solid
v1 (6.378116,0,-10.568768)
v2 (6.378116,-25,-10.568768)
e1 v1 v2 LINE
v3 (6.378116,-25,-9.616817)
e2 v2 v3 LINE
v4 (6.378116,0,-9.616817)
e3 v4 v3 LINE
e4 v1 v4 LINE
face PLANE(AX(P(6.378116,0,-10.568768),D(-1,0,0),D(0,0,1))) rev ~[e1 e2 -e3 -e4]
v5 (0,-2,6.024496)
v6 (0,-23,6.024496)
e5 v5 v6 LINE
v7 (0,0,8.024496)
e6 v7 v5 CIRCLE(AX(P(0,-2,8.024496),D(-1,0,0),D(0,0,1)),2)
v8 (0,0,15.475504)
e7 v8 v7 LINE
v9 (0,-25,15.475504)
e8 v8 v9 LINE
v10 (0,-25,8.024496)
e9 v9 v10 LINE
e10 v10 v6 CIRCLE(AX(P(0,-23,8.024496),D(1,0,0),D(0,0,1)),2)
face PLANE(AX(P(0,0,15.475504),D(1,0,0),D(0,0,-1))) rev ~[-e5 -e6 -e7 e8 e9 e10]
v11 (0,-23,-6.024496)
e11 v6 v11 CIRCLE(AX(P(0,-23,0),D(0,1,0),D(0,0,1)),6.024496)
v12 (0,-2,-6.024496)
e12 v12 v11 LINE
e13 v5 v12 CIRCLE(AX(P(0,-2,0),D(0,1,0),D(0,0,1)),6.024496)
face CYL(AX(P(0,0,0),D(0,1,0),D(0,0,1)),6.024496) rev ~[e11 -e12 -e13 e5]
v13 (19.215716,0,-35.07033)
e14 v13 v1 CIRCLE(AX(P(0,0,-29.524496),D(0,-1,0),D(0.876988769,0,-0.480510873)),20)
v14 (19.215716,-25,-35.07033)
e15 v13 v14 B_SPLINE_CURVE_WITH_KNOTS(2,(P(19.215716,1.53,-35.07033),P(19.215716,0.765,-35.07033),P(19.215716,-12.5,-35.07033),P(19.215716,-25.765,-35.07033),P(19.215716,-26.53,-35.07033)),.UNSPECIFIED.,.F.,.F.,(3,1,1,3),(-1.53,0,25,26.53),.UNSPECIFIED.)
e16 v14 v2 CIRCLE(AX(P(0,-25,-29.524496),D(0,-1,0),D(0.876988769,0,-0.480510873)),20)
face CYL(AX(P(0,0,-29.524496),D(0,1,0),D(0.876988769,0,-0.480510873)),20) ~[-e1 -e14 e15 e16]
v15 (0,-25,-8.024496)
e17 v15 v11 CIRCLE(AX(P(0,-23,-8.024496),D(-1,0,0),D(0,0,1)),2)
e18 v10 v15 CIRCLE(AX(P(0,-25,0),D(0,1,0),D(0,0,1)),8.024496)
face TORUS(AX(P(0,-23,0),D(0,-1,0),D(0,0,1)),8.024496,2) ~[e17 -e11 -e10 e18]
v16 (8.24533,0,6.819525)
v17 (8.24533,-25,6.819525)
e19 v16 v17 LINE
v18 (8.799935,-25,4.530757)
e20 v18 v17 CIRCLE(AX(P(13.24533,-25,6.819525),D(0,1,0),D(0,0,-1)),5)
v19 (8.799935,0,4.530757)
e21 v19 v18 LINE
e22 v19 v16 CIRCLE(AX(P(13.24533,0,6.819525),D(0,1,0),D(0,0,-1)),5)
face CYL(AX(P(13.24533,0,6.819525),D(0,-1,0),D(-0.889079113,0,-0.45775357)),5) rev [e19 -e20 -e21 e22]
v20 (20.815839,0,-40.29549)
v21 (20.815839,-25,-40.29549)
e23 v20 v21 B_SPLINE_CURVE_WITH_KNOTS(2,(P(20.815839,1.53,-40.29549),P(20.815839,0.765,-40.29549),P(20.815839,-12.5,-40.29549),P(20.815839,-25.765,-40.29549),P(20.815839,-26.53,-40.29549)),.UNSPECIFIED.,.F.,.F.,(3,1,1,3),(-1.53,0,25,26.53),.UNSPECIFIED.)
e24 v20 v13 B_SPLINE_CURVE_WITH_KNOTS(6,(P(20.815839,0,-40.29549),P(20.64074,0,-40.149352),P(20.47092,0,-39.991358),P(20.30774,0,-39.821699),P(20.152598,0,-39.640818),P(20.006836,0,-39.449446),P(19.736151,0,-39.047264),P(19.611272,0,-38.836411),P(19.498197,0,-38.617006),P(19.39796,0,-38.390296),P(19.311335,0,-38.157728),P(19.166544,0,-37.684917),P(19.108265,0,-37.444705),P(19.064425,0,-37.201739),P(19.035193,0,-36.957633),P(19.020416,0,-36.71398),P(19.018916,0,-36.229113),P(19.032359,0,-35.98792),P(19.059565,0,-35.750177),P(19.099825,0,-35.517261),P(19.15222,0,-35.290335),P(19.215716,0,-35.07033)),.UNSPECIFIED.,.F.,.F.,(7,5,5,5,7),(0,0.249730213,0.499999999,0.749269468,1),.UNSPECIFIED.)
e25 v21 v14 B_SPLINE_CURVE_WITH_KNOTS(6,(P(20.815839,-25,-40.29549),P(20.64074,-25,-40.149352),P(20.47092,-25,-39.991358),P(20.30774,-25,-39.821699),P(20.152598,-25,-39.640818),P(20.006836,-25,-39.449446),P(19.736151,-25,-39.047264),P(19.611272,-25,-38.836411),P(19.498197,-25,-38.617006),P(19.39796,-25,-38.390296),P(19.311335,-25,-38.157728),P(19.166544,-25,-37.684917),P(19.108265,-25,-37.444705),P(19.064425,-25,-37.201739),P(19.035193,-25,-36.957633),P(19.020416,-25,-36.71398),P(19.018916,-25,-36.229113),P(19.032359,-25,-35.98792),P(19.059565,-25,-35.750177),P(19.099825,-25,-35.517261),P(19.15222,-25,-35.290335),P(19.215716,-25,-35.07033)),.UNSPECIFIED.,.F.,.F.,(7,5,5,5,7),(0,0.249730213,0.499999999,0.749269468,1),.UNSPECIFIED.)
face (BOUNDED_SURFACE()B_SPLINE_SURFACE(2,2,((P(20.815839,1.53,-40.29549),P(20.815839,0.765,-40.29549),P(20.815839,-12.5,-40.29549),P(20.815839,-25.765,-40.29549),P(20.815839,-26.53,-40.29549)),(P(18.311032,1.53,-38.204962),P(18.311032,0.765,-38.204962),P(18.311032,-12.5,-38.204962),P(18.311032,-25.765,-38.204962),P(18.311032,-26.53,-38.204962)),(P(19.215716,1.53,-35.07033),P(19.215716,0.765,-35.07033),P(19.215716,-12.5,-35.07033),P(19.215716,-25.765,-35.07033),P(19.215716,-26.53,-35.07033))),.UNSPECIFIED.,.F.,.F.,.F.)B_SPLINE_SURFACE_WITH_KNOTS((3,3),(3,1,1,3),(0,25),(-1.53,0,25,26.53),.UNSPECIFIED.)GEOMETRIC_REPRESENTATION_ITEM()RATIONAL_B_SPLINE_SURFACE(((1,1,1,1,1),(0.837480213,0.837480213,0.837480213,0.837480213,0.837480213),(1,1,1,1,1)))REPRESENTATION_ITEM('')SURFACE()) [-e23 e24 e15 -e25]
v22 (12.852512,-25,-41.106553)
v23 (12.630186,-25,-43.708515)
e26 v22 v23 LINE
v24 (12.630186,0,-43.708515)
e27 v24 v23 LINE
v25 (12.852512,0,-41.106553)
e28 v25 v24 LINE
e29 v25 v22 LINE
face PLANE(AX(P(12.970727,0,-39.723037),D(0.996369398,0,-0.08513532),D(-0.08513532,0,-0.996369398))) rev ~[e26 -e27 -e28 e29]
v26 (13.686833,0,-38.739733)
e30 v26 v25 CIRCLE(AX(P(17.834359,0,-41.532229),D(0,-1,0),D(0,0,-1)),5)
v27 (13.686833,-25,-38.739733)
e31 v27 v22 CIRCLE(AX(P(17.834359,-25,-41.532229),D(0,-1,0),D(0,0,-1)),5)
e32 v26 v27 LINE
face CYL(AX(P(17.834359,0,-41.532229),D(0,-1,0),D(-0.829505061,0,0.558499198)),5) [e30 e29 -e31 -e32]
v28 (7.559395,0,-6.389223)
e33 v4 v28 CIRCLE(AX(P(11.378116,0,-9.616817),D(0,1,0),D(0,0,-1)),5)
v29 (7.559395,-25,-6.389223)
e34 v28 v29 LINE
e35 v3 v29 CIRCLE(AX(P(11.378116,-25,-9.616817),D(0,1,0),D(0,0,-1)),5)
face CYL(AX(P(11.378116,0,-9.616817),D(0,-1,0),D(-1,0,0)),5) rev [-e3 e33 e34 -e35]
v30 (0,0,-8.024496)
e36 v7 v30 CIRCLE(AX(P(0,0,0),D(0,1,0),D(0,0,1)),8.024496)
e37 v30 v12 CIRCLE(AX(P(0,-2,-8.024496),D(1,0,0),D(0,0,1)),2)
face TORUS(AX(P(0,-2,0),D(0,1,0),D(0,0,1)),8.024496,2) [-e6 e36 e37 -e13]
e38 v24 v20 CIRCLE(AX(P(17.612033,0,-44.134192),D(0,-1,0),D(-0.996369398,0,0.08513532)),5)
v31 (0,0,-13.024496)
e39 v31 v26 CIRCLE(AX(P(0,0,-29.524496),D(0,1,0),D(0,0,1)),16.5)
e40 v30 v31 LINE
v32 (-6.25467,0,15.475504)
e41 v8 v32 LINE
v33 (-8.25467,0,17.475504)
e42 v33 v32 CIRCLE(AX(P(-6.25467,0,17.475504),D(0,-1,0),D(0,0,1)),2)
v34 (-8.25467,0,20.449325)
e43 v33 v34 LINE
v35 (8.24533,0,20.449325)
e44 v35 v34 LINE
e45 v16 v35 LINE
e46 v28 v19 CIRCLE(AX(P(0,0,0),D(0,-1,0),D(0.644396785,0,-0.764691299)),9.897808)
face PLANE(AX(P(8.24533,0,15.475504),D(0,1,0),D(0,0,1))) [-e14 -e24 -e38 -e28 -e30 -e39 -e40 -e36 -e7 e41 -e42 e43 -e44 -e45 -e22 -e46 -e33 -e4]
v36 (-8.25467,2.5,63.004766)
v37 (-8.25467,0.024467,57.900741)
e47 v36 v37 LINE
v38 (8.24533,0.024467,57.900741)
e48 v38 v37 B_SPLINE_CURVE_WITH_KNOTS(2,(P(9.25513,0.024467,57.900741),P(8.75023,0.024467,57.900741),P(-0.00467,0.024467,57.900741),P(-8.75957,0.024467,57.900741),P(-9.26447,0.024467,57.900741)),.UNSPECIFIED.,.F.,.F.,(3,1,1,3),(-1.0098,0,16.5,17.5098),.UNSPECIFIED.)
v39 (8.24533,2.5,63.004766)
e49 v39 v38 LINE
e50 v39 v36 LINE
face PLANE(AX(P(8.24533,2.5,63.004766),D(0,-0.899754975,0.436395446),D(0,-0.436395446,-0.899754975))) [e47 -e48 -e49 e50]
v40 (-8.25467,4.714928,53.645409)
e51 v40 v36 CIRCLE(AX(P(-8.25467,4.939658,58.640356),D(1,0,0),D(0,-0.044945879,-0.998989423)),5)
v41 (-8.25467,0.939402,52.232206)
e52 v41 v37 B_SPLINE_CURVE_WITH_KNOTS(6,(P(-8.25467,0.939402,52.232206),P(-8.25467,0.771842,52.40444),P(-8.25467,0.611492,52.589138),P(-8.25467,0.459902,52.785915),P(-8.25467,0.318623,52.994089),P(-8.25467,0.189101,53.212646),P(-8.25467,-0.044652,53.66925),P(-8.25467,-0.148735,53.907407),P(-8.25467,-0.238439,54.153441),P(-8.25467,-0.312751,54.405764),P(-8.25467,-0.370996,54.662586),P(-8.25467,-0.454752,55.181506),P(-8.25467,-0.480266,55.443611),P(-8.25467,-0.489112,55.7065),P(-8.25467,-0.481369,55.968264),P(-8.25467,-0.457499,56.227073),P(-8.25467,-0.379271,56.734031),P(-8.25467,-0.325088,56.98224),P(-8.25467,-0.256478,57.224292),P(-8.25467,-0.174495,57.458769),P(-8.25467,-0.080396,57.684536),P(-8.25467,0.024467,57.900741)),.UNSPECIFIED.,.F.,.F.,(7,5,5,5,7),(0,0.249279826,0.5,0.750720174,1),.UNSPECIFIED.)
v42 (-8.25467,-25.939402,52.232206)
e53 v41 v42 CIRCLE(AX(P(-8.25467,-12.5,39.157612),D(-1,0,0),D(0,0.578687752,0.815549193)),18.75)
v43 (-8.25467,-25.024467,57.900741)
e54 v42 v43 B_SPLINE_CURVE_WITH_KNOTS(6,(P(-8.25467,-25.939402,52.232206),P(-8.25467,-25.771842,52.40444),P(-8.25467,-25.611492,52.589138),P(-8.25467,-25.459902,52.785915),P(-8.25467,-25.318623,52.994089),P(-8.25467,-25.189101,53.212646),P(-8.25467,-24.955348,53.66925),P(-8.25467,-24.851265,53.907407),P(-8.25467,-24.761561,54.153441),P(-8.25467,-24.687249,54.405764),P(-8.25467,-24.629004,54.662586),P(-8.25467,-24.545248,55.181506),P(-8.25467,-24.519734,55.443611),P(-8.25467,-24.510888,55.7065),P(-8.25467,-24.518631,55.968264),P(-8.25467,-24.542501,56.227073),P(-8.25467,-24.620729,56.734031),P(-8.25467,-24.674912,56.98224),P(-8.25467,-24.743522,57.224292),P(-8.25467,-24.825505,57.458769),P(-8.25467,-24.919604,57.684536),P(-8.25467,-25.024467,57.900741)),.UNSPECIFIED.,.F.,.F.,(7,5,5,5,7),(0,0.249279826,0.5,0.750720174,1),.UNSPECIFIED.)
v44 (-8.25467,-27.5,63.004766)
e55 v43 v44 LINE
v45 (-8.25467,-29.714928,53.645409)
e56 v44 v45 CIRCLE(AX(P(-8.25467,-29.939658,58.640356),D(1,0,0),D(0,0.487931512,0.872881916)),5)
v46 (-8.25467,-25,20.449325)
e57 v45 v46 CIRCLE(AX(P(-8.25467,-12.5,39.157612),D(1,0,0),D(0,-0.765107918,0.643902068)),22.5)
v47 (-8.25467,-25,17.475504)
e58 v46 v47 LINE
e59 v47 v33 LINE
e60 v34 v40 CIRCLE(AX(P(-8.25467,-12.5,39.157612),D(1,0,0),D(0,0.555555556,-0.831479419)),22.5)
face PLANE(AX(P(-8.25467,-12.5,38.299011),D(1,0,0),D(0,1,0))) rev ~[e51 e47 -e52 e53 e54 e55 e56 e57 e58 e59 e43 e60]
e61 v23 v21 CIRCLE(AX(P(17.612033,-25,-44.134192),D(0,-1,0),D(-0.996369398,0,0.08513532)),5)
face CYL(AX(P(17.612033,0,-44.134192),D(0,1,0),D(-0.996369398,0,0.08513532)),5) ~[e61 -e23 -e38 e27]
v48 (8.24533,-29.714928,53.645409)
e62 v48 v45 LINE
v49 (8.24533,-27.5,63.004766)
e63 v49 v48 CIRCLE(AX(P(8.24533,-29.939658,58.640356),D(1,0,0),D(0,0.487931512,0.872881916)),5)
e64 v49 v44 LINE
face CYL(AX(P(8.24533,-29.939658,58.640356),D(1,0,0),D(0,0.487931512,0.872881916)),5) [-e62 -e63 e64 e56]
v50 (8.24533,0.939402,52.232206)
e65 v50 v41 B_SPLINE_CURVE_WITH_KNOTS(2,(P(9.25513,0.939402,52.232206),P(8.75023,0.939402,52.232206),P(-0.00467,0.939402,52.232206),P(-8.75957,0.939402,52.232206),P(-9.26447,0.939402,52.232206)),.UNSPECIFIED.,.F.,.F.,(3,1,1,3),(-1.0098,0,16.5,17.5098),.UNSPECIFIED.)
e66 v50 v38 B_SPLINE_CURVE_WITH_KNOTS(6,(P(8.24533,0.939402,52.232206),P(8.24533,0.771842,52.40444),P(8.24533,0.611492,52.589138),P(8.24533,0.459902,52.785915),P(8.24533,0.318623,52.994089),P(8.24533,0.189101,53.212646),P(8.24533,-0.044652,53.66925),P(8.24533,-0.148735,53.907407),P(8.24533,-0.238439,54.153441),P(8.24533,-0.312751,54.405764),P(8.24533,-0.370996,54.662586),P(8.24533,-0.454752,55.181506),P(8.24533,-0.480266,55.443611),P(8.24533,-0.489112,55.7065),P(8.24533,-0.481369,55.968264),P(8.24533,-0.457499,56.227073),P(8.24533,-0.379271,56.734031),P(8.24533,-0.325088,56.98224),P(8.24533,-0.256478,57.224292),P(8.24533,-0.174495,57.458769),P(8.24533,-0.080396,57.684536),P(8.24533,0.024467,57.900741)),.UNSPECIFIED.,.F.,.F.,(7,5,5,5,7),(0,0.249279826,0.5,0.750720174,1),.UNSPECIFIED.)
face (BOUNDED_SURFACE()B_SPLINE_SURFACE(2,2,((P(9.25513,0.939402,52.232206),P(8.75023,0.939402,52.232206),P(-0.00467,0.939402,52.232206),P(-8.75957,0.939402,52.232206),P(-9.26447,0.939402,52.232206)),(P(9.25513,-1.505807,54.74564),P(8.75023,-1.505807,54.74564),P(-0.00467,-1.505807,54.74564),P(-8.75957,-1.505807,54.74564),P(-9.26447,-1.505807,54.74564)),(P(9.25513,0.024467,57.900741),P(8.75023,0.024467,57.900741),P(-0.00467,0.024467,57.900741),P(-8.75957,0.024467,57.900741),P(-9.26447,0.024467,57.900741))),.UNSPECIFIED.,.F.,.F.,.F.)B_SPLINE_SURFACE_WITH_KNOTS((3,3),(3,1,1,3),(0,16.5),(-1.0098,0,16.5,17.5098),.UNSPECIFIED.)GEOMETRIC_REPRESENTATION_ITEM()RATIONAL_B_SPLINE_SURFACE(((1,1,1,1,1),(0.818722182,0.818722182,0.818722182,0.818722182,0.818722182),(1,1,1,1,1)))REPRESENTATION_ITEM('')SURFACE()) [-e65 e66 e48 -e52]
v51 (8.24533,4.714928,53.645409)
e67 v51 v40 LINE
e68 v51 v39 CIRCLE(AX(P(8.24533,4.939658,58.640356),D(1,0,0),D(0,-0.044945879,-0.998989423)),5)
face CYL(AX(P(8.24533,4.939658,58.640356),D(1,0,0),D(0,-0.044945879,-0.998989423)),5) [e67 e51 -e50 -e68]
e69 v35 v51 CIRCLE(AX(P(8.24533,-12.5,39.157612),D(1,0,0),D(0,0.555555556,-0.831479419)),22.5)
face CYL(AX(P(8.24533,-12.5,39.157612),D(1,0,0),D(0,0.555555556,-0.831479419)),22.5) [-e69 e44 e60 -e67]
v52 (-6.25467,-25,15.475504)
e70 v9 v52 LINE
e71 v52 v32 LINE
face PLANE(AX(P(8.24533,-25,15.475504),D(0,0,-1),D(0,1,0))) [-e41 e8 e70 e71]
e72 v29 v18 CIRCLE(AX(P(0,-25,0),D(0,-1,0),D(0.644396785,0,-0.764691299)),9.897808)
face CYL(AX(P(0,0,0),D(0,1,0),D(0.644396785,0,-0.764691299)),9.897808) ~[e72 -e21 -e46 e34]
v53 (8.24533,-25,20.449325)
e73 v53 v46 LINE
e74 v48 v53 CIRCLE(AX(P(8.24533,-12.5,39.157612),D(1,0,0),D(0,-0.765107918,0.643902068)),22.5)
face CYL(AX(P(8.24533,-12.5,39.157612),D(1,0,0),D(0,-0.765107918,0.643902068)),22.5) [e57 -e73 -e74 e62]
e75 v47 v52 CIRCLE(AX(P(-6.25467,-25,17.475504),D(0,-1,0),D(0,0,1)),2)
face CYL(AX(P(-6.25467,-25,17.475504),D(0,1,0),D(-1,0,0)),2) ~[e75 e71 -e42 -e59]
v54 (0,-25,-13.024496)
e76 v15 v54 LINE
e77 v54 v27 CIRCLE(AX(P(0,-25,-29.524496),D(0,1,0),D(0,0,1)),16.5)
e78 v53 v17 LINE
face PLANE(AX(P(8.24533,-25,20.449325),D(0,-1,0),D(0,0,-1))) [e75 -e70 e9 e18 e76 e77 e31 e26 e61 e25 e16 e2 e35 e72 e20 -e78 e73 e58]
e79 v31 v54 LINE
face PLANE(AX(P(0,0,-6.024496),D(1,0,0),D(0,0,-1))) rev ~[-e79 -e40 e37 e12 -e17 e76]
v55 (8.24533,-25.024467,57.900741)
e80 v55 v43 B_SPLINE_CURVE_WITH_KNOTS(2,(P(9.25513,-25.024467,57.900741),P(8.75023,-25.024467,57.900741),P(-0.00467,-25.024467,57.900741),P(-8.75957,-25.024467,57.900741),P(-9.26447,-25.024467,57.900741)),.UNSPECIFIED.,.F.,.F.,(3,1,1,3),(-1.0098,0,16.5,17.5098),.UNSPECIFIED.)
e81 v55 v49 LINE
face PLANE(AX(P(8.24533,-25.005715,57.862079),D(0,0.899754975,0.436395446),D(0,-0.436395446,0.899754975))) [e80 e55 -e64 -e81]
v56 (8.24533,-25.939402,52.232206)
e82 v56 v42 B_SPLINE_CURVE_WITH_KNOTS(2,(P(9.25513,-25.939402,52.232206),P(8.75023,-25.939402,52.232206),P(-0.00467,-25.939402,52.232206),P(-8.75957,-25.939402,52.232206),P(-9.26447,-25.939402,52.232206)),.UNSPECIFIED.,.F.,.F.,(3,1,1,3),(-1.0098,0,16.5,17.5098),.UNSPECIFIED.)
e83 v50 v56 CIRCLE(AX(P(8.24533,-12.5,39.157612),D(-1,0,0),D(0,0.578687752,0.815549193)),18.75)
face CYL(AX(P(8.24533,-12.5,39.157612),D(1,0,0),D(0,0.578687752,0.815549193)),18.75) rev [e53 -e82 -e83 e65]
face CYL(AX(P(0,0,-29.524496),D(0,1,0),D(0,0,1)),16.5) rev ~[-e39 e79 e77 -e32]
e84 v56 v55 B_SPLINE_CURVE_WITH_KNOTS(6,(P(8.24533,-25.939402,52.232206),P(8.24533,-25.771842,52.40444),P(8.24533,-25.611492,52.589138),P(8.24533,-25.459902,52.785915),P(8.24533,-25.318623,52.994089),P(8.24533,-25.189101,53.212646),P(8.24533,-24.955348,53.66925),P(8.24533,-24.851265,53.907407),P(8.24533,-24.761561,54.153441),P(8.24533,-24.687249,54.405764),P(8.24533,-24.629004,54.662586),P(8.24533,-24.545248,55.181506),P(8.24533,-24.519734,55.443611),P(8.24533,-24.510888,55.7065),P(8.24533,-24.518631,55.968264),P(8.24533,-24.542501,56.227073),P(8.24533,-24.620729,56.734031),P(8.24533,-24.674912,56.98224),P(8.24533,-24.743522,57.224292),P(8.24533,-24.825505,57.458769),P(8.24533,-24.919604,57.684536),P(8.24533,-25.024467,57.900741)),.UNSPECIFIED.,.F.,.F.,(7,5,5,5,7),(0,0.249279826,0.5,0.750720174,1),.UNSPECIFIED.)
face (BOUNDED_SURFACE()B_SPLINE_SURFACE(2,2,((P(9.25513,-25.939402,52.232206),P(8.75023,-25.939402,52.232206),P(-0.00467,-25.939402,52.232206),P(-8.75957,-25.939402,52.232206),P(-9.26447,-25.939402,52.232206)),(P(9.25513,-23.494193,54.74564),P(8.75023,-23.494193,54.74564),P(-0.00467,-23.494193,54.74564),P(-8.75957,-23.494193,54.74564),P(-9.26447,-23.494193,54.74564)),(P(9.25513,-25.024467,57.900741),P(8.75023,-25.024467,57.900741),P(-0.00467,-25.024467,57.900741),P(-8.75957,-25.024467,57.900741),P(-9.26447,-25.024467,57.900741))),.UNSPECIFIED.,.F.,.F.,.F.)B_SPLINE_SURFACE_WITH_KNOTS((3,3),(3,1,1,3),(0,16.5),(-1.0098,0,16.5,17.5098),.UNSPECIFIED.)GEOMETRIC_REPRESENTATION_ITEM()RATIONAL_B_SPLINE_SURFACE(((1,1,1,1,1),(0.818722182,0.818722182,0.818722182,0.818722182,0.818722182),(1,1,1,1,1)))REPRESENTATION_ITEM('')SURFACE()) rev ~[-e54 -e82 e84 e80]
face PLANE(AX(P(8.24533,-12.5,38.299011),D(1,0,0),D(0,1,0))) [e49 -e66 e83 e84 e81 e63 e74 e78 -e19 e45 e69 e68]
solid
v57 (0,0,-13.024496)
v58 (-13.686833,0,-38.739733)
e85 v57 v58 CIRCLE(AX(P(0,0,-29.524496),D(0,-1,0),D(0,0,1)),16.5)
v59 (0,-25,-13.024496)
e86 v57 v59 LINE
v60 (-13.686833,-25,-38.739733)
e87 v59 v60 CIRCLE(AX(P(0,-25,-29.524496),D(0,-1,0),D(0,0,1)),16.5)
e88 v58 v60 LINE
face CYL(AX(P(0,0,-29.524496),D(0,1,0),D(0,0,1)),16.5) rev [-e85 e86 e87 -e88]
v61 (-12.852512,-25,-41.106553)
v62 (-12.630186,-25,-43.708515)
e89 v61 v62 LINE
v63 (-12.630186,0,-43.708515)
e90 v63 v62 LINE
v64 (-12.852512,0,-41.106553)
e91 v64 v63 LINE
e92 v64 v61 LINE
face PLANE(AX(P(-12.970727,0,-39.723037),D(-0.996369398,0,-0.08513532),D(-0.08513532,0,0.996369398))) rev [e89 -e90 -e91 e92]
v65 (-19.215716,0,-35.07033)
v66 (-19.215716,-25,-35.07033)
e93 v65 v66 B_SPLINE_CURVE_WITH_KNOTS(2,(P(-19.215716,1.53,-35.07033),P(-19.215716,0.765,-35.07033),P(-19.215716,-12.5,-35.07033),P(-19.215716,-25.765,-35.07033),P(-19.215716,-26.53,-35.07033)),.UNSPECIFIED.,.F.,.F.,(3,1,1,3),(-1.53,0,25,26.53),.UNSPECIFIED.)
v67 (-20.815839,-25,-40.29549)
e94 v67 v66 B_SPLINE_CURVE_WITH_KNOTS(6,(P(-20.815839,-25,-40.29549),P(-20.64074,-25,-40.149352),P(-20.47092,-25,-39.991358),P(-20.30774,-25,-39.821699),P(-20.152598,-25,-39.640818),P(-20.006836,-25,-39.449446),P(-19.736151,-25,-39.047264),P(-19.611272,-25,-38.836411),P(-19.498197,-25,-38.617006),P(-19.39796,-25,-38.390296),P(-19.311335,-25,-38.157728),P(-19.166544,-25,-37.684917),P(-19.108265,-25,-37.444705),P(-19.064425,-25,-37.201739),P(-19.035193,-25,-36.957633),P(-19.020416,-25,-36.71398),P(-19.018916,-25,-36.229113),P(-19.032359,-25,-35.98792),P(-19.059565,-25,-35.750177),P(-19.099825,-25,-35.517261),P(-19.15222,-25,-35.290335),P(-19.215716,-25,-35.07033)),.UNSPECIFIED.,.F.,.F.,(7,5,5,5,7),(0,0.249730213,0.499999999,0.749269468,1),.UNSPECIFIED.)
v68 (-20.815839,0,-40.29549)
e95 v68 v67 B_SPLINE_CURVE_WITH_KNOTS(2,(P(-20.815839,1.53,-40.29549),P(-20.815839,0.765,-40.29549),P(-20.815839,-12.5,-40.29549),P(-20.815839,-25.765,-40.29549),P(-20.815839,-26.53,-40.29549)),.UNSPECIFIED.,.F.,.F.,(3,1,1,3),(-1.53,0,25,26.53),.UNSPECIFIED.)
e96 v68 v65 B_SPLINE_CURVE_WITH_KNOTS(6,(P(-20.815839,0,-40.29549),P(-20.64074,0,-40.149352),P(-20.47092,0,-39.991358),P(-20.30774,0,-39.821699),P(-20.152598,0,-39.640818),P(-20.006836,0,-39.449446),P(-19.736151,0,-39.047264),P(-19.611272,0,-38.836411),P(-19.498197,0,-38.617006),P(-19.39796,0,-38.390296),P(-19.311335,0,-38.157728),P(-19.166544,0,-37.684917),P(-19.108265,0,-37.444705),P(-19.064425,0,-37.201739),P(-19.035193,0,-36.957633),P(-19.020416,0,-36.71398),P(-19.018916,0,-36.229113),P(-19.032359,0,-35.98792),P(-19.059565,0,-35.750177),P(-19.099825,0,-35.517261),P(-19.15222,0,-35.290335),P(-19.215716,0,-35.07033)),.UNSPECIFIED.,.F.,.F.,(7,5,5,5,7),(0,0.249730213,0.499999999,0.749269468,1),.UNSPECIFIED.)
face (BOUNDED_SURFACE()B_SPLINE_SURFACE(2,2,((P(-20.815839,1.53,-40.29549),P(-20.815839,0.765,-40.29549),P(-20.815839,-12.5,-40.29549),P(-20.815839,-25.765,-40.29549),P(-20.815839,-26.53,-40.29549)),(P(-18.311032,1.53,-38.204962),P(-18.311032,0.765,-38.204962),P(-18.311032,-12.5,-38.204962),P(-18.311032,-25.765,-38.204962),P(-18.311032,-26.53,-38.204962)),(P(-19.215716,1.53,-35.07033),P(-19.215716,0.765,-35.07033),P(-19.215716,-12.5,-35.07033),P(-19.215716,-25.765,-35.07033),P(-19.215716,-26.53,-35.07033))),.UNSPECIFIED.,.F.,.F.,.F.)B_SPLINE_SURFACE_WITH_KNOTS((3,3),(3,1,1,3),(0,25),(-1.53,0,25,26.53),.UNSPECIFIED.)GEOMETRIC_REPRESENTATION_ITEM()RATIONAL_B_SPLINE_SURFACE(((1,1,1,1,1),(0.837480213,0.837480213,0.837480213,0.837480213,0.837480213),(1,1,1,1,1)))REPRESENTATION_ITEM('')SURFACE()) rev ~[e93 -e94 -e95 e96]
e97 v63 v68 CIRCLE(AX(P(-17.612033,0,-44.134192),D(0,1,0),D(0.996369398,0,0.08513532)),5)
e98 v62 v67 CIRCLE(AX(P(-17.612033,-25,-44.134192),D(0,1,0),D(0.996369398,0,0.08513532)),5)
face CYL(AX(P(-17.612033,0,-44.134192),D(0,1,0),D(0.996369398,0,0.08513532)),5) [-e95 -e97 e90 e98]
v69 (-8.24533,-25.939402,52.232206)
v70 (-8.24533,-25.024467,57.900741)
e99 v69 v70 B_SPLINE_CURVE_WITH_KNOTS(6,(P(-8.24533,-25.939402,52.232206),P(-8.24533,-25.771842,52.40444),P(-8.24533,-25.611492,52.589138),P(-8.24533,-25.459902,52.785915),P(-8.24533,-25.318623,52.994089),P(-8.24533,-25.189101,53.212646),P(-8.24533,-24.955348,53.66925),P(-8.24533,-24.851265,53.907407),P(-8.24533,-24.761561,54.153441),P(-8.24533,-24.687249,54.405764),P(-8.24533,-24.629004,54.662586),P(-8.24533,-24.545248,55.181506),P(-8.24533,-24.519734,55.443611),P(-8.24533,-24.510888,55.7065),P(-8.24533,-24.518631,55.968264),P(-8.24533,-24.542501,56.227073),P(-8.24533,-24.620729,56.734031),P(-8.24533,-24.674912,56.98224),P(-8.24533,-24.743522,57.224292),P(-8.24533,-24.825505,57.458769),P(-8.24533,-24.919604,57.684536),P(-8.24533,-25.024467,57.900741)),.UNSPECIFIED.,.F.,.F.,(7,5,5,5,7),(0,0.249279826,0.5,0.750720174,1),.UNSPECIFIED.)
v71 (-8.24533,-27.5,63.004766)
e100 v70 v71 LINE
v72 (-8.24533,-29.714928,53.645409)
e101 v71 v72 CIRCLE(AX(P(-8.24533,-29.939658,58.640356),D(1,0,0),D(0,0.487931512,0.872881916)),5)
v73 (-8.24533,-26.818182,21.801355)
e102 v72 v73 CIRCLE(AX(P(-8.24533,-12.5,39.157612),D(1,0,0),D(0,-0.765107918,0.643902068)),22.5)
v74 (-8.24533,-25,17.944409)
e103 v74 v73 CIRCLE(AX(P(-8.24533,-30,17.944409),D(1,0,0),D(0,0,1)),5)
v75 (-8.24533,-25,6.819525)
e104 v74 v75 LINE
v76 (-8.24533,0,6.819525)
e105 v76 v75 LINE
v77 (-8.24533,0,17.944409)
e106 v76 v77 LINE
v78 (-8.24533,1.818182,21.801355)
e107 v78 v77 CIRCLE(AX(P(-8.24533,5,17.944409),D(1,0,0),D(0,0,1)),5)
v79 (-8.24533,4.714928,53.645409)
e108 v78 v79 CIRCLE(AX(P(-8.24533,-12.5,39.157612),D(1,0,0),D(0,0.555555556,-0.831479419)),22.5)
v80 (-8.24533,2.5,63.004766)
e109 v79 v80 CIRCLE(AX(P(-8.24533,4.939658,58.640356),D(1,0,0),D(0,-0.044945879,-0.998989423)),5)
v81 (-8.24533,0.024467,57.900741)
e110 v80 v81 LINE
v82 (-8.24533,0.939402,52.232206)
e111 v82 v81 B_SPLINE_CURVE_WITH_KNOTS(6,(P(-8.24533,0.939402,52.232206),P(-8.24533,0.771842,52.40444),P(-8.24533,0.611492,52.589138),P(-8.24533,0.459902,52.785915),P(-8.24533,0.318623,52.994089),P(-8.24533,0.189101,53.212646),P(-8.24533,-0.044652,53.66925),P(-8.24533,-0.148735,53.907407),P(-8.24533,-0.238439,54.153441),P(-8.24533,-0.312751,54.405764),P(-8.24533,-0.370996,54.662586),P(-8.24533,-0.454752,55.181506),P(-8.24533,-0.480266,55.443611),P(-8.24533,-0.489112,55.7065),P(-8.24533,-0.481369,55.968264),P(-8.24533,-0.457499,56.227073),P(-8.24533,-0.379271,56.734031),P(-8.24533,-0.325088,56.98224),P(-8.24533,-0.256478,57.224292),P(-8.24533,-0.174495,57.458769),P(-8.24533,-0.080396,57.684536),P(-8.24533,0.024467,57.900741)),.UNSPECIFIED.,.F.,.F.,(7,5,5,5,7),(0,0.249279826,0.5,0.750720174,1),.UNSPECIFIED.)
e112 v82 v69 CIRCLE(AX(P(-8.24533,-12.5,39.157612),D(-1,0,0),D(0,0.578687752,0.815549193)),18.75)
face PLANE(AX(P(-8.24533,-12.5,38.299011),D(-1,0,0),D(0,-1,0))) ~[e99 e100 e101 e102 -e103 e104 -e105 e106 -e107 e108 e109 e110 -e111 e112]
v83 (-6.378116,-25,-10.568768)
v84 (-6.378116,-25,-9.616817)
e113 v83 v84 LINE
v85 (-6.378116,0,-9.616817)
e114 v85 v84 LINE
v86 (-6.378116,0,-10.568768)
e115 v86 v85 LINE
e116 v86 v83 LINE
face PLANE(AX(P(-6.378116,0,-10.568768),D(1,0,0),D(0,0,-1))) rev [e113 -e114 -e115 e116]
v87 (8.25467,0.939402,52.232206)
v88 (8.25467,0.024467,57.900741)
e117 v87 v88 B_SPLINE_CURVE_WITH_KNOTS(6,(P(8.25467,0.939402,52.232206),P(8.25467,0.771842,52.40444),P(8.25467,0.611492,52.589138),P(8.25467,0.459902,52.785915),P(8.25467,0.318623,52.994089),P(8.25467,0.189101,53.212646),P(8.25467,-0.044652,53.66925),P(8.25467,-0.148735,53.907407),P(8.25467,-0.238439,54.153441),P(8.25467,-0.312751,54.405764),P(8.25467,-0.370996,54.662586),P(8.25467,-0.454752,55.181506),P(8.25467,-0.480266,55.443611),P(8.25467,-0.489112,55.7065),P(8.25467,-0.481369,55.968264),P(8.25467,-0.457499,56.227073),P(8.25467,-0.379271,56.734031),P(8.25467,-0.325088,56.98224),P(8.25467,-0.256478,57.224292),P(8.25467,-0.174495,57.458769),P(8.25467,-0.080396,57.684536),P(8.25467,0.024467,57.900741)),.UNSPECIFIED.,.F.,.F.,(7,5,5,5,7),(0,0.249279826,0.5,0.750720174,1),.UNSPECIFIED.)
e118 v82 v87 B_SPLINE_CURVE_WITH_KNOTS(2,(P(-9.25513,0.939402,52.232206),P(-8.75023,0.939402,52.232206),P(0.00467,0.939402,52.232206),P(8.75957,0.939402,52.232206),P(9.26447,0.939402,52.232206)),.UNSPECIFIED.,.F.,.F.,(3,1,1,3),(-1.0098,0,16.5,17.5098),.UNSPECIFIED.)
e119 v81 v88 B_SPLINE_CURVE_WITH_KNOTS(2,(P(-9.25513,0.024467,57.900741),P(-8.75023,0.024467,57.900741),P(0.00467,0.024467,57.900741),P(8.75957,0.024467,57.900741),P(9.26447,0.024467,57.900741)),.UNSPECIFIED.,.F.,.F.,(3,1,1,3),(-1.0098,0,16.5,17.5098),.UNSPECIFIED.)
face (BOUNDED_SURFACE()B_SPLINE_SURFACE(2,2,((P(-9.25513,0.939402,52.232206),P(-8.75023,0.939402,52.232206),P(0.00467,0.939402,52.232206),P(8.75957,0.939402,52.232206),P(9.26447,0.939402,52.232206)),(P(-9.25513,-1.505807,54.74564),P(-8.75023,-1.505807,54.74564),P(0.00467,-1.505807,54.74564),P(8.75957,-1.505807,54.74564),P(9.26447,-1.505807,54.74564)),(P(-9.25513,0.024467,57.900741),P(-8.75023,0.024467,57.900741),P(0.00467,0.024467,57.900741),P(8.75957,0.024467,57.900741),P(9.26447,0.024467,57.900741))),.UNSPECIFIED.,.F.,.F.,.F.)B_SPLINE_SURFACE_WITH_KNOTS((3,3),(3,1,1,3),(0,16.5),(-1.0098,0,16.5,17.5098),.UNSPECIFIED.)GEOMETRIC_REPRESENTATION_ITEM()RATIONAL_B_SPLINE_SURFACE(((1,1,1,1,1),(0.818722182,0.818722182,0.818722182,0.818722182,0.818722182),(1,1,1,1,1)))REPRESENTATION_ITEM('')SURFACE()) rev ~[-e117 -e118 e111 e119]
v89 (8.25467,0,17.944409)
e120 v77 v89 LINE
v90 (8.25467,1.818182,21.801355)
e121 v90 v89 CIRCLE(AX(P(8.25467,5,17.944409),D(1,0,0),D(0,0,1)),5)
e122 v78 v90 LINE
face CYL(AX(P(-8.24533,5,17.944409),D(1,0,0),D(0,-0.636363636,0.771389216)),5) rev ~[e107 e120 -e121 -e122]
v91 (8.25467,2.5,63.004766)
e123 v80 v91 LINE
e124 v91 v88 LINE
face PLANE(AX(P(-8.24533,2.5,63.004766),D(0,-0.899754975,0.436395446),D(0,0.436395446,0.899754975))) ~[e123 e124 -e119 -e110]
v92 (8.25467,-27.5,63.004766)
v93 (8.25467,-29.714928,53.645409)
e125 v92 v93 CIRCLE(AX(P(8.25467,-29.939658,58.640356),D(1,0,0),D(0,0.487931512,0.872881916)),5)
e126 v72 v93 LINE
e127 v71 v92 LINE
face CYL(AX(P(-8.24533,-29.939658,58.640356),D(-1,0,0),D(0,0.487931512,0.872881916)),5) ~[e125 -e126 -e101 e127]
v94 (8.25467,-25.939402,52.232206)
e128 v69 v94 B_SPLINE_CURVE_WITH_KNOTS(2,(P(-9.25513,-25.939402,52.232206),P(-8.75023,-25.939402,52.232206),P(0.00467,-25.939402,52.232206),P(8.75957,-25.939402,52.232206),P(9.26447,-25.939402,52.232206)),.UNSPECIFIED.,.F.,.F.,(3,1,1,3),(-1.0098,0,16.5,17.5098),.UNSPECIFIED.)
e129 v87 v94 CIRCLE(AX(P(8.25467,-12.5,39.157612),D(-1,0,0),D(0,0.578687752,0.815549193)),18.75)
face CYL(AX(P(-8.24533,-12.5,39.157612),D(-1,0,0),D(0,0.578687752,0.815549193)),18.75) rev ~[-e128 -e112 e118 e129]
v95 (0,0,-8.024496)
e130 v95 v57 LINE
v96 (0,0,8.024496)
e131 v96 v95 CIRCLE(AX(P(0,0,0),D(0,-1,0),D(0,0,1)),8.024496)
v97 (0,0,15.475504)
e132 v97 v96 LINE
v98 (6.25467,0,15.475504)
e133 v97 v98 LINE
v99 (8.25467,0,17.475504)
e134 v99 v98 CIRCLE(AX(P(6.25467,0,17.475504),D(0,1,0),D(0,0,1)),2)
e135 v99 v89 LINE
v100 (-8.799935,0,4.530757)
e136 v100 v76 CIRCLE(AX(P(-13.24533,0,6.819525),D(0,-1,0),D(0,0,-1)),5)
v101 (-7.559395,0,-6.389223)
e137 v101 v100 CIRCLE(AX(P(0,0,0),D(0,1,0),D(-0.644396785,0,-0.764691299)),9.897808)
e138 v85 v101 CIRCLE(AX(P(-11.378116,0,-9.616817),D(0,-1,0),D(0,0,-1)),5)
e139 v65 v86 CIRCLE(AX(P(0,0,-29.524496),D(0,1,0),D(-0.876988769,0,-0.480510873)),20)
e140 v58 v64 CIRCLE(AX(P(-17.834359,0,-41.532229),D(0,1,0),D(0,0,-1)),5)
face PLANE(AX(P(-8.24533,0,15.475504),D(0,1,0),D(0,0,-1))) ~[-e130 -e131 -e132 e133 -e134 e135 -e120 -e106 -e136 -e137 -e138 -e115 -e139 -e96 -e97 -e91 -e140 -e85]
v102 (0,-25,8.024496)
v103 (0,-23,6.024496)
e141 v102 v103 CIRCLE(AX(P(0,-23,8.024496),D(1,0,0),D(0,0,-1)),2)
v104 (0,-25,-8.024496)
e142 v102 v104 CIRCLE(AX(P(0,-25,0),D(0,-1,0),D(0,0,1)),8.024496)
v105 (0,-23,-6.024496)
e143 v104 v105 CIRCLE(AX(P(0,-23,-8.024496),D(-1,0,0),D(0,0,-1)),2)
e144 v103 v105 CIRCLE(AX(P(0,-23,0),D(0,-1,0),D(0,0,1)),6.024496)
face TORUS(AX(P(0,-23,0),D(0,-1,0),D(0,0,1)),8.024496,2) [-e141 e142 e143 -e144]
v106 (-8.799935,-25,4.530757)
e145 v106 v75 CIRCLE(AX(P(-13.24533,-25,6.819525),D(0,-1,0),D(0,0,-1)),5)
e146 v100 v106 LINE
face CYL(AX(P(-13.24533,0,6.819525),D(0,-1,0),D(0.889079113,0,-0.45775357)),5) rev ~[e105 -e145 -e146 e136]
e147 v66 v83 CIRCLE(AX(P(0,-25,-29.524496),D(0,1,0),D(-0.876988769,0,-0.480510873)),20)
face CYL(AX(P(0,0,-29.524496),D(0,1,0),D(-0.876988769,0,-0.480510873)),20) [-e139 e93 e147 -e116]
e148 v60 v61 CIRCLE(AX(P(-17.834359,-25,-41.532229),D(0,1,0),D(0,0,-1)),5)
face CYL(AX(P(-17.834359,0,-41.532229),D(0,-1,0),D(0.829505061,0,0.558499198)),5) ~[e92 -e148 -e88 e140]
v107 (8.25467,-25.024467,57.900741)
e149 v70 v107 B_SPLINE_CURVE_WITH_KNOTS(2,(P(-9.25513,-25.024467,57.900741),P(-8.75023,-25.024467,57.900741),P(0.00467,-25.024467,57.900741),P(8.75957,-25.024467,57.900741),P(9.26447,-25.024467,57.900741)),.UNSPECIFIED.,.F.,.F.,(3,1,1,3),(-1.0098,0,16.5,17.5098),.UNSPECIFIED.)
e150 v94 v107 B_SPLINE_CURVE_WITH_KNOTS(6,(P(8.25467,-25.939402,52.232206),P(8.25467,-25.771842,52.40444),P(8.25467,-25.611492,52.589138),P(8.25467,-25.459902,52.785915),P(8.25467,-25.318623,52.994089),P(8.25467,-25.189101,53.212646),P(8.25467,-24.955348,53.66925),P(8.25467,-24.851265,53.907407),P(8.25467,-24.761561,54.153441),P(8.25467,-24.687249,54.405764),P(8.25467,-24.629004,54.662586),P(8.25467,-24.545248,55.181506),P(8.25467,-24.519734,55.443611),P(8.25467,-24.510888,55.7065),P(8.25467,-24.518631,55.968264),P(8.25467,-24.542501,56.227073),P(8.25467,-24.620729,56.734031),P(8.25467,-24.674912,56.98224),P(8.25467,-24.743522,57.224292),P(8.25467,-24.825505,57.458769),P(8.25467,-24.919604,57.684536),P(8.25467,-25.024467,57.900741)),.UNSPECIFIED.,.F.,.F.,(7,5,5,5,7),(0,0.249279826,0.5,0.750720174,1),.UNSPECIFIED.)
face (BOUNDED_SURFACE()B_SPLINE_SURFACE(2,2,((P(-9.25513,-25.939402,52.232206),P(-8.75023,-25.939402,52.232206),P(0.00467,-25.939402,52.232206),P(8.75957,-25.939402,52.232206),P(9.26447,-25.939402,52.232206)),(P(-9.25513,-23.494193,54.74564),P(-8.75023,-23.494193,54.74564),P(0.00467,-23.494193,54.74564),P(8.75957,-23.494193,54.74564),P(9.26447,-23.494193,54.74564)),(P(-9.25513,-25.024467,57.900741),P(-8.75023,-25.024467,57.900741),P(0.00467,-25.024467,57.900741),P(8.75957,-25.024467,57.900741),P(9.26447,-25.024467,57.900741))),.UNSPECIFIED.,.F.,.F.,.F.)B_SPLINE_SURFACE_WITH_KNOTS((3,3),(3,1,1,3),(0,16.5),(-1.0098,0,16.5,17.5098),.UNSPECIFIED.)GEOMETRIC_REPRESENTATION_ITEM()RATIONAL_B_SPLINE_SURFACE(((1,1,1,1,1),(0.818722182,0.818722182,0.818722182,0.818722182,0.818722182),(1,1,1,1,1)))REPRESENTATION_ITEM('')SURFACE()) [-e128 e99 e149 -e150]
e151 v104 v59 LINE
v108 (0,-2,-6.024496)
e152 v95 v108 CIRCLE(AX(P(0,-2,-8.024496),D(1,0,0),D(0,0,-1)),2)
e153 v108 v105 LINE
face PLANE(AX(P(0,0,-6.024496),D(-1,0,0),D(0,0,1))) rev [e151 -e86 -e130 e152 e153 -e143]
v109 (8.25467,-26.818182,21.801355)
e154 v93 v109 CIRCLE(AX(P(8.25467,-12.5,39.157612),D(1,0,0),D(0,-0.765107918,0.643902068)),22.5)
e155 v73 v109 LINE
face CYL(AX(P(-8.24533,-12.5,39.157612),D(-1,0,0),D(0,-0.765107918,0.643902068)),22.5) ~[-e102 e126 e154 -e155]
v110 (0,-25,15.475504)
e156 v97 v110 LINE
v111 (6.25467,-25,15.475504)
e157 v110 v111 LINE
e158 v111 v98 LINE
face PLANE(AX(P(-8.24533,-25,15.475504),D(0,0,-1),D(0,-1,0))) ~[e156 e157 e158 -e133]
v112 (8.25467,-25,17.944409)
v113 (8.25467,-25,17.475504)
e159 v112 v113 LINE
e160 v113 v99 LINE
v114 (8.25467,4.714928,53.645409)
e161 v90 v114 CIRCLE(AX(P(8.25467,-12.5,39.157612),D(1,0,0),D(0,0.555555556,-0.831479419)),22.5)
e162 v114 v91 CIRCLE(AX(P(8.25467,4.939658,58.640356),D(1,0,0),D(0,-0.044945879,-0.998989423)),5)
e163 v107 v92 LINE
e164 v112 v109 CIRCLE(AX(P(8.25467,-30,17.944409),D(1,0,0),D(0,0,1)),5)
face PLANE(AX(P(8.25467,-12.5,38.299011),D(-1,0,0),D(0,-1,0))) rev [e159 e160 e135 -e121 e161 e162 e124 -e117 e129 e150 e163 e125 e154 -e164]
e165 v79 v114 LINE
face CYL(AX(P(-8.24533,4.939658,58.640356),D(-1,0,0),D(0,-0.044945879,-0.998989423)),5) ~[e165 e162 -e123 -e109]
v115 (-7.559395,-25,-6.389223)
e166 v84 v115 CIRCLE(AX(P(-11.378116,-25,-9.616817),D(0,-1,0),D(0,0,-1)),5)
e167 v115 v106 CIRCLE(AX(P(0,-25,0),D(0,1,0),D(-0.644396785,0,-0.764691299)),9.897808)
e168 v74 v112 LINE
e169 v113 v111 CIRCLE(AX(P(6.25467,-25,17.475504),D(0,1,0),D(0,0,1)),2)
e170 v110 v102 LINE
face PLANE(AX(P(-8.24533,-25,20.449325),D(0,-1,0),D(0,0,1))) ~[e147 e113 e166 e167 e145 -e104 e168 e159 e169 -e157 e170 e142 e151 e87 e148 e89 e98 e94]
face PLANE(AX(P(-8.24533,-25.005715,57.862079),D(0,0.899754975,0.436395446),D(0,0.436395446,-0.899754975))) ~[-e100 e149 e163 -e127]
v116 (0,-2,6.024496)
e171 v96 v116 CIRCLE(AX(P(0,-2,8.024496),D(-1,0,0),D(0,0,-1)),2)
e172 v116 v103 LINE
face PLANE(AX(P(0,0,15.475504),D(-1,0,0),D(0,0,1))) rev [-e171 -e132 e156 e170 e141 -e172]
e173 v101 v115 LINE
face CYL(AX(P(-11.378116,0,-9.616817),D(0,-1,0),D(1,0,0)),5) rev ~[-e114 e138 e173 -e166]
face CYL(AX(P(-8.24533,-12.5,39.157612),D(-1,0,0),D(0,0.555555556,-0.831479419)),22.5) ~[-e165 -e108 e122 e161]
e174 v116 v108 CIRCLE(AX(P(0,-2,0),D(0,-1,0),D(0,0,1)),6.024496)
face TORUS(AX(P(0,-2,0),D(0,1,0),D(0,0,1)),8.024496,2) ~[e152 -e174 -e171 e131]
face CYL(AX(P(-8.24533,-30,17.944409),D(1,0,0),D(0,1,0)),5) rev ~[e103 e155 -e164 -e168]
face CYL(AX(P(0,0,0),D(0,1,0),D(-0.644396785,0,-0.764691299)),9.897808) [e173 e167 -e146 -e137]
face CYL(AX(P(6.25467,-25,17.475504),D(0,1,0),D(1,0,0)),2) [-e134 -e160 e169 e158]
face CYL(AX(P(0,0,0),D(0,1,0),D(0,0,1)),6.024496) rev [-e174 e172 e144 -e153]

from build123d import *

# Parameters (mm, degrees)
F1_DEPTH = 25
F3_DEPTH = 16.5
F5_R     = 5
F5_2_R   = 5
F6_R     = 2
F6_2_R   = 2


with BuildPart() as f1:
    # F0 (on Front) → F1 (new body)
    with BuildSketch(Plane.XZ):
        with BuildLine():
            ThreePointArc((0, -13.0244963626), (14.841258851, -22.3142927791), (12.9707270003, -39.7230374879))
            Line((12.9707270003, -39.7230374879), (12.6301857194, -43.7085150799))
            ThreePointArc((12.6301857194, -43.7085150799), (21.0202444261, -47.7926193342), (17.539775381, -39.1347138203))
            ThreePointArc((17.539775381, -39.1347138203), (18.6284646808, -22.2457393509), (6.3781159631, -10.5687680263))
            Line((6.3781159631, -10.5687680263), (6.3781159631, -7.5687680263))
            ThreePointArc((6.3781159631, -7.5687680263), (9.7979360751, -1.4025196408), (8.2453303507, 5.4755036374))
            Line((8.2453303507, 5.4755036374), (8.2453303507, 15.4755036374))
            Line((8.2453303507, 15.4755036374), (0, 15.4755036374))
            Line((0, 15.4755036374), (0, 6.0244963626))
            ThreePointArc((0, 6.0244963626), (6.0244963626, 0), (0, -6.0244963626))
            Line((0, -6.0244963626), (0, -13.0244963626))
        make_face()
    extrude(amount=F1_DEPTH)

    # F2 (on face) → F3 (join)
    with BuildSketch(Plane.YZ.offset(8.2453303507)):
        with BuildLine():
            ThreePointArc((-1.6496046584, 54.4491597502), (-12.5, 20.4076123815), (-23.3503953416, 54.4491597502))
            Line((-23.3503953416, 54.4491597502), (-25.001859694, 57.8541294423))
            Line((-25.001859694, 57.8541294423), (-25.0057154727, 57.8620792414))
            Line((-25.0057154727, 57.8620792414), (-27.5, 63.0047656136))
            ThreePointArc((-27.5, 63.0047656136), (-34.8052642949, 59.7918207884), (-29.7149281613, 53.6454089151))
            ThreePointArc((-29.7149281613, 53.6454089151), (-34.7764276378, 35.993632025), (-25, 20.4493254476))
            Line((-25, 20.4493254476), (-25, 15.4755036374))
            Line((-25, 15.4755036374), (0, 15.4755036374))
            Line((0, 15.4755036374), (0, 20.4493254476))
            ThreePointArc((0, 20.4493254476), (9.7764276378, 35.993632025), (4.7149281613, 53.6454089151))
            ThreePointArc((4.7149281613, 53.6454089151), (9.8052642949, 59.7918207884), (2.5, 63.0047656136))
            Line((2.5, 63.0047656136), (0.0057154727, 57.8620792414))
            Line((0.0057154727, 57.8620792414), (0.001859694, 57.8541294423))
            Line((0.001859694, 57.8541294423), (-1.6496046584, 54.4491597502))
        make_face()
    extrude(amount=-F3_DEPTH)


with BuildPart() as f4_1:
    # F4: instance of F1
    add(f1.part.mirror(Plane.YZ))

    # F5#2
    f5_2_edges = [f4_1.edges().sort_by_distance(p)[0] for p in [
        (-12.970727, -12.5, -39.723037),
        (-17.539775, -12.5, -39.134714),
        (-8.24533, -12.5, 5.475504),
        (-6.378116, -12.5, -7.568768),
        (0.00467, 0, 20.449325),
        (0.00467, -25, 20.449325),
        (0.00467, -1.649605, 54.44916),
        (0.00467, -23.350395, 54.44916),
    ]]
    fillet(f5_2_edges, radius=F5_2_R)

    # F6#2
    f6_2_edges = [f4_1.edges().sort_by_distance(p)[0] for p in [
        (-6.024496, -25, 0),
        (-6.024496, 0, 0),
        (8.25467, -12.5, 15.475504),
    ]]
    fillet(f6_2_edges, radius=F6_2_R)


with BuildPart() as f1_1:
    add(f1.part)

    # F5
    f5_edges = [f1_1.edges().sort_by_distance(p)[0] for p in [
        (12.970727, -12.5, -39.723037),
        (17.539775, -12.5, -39.134714),
        (8.24533, -12.5, 5.475504),
        (6.378116, -12.5, -7.568768),
        (-0.00467, -1.649605, 54.44916),
        (-0.00467, -23.350395, 54.44916),
    ]]
    fillet(f5_edges, radius=F5_R)

    # F6
    f6_edges = [f1_1.edges().sort_by_distance(p)[0] for p in [
        (6.024496, -25, 0),
        (6.024496, 0, 0),
        (-8.25467, -12.5, 15.475504),
    ]]
    fillet(f6_edges, radius=F6_R)


solid = Compound([f4_1.part, f1_1.part])
